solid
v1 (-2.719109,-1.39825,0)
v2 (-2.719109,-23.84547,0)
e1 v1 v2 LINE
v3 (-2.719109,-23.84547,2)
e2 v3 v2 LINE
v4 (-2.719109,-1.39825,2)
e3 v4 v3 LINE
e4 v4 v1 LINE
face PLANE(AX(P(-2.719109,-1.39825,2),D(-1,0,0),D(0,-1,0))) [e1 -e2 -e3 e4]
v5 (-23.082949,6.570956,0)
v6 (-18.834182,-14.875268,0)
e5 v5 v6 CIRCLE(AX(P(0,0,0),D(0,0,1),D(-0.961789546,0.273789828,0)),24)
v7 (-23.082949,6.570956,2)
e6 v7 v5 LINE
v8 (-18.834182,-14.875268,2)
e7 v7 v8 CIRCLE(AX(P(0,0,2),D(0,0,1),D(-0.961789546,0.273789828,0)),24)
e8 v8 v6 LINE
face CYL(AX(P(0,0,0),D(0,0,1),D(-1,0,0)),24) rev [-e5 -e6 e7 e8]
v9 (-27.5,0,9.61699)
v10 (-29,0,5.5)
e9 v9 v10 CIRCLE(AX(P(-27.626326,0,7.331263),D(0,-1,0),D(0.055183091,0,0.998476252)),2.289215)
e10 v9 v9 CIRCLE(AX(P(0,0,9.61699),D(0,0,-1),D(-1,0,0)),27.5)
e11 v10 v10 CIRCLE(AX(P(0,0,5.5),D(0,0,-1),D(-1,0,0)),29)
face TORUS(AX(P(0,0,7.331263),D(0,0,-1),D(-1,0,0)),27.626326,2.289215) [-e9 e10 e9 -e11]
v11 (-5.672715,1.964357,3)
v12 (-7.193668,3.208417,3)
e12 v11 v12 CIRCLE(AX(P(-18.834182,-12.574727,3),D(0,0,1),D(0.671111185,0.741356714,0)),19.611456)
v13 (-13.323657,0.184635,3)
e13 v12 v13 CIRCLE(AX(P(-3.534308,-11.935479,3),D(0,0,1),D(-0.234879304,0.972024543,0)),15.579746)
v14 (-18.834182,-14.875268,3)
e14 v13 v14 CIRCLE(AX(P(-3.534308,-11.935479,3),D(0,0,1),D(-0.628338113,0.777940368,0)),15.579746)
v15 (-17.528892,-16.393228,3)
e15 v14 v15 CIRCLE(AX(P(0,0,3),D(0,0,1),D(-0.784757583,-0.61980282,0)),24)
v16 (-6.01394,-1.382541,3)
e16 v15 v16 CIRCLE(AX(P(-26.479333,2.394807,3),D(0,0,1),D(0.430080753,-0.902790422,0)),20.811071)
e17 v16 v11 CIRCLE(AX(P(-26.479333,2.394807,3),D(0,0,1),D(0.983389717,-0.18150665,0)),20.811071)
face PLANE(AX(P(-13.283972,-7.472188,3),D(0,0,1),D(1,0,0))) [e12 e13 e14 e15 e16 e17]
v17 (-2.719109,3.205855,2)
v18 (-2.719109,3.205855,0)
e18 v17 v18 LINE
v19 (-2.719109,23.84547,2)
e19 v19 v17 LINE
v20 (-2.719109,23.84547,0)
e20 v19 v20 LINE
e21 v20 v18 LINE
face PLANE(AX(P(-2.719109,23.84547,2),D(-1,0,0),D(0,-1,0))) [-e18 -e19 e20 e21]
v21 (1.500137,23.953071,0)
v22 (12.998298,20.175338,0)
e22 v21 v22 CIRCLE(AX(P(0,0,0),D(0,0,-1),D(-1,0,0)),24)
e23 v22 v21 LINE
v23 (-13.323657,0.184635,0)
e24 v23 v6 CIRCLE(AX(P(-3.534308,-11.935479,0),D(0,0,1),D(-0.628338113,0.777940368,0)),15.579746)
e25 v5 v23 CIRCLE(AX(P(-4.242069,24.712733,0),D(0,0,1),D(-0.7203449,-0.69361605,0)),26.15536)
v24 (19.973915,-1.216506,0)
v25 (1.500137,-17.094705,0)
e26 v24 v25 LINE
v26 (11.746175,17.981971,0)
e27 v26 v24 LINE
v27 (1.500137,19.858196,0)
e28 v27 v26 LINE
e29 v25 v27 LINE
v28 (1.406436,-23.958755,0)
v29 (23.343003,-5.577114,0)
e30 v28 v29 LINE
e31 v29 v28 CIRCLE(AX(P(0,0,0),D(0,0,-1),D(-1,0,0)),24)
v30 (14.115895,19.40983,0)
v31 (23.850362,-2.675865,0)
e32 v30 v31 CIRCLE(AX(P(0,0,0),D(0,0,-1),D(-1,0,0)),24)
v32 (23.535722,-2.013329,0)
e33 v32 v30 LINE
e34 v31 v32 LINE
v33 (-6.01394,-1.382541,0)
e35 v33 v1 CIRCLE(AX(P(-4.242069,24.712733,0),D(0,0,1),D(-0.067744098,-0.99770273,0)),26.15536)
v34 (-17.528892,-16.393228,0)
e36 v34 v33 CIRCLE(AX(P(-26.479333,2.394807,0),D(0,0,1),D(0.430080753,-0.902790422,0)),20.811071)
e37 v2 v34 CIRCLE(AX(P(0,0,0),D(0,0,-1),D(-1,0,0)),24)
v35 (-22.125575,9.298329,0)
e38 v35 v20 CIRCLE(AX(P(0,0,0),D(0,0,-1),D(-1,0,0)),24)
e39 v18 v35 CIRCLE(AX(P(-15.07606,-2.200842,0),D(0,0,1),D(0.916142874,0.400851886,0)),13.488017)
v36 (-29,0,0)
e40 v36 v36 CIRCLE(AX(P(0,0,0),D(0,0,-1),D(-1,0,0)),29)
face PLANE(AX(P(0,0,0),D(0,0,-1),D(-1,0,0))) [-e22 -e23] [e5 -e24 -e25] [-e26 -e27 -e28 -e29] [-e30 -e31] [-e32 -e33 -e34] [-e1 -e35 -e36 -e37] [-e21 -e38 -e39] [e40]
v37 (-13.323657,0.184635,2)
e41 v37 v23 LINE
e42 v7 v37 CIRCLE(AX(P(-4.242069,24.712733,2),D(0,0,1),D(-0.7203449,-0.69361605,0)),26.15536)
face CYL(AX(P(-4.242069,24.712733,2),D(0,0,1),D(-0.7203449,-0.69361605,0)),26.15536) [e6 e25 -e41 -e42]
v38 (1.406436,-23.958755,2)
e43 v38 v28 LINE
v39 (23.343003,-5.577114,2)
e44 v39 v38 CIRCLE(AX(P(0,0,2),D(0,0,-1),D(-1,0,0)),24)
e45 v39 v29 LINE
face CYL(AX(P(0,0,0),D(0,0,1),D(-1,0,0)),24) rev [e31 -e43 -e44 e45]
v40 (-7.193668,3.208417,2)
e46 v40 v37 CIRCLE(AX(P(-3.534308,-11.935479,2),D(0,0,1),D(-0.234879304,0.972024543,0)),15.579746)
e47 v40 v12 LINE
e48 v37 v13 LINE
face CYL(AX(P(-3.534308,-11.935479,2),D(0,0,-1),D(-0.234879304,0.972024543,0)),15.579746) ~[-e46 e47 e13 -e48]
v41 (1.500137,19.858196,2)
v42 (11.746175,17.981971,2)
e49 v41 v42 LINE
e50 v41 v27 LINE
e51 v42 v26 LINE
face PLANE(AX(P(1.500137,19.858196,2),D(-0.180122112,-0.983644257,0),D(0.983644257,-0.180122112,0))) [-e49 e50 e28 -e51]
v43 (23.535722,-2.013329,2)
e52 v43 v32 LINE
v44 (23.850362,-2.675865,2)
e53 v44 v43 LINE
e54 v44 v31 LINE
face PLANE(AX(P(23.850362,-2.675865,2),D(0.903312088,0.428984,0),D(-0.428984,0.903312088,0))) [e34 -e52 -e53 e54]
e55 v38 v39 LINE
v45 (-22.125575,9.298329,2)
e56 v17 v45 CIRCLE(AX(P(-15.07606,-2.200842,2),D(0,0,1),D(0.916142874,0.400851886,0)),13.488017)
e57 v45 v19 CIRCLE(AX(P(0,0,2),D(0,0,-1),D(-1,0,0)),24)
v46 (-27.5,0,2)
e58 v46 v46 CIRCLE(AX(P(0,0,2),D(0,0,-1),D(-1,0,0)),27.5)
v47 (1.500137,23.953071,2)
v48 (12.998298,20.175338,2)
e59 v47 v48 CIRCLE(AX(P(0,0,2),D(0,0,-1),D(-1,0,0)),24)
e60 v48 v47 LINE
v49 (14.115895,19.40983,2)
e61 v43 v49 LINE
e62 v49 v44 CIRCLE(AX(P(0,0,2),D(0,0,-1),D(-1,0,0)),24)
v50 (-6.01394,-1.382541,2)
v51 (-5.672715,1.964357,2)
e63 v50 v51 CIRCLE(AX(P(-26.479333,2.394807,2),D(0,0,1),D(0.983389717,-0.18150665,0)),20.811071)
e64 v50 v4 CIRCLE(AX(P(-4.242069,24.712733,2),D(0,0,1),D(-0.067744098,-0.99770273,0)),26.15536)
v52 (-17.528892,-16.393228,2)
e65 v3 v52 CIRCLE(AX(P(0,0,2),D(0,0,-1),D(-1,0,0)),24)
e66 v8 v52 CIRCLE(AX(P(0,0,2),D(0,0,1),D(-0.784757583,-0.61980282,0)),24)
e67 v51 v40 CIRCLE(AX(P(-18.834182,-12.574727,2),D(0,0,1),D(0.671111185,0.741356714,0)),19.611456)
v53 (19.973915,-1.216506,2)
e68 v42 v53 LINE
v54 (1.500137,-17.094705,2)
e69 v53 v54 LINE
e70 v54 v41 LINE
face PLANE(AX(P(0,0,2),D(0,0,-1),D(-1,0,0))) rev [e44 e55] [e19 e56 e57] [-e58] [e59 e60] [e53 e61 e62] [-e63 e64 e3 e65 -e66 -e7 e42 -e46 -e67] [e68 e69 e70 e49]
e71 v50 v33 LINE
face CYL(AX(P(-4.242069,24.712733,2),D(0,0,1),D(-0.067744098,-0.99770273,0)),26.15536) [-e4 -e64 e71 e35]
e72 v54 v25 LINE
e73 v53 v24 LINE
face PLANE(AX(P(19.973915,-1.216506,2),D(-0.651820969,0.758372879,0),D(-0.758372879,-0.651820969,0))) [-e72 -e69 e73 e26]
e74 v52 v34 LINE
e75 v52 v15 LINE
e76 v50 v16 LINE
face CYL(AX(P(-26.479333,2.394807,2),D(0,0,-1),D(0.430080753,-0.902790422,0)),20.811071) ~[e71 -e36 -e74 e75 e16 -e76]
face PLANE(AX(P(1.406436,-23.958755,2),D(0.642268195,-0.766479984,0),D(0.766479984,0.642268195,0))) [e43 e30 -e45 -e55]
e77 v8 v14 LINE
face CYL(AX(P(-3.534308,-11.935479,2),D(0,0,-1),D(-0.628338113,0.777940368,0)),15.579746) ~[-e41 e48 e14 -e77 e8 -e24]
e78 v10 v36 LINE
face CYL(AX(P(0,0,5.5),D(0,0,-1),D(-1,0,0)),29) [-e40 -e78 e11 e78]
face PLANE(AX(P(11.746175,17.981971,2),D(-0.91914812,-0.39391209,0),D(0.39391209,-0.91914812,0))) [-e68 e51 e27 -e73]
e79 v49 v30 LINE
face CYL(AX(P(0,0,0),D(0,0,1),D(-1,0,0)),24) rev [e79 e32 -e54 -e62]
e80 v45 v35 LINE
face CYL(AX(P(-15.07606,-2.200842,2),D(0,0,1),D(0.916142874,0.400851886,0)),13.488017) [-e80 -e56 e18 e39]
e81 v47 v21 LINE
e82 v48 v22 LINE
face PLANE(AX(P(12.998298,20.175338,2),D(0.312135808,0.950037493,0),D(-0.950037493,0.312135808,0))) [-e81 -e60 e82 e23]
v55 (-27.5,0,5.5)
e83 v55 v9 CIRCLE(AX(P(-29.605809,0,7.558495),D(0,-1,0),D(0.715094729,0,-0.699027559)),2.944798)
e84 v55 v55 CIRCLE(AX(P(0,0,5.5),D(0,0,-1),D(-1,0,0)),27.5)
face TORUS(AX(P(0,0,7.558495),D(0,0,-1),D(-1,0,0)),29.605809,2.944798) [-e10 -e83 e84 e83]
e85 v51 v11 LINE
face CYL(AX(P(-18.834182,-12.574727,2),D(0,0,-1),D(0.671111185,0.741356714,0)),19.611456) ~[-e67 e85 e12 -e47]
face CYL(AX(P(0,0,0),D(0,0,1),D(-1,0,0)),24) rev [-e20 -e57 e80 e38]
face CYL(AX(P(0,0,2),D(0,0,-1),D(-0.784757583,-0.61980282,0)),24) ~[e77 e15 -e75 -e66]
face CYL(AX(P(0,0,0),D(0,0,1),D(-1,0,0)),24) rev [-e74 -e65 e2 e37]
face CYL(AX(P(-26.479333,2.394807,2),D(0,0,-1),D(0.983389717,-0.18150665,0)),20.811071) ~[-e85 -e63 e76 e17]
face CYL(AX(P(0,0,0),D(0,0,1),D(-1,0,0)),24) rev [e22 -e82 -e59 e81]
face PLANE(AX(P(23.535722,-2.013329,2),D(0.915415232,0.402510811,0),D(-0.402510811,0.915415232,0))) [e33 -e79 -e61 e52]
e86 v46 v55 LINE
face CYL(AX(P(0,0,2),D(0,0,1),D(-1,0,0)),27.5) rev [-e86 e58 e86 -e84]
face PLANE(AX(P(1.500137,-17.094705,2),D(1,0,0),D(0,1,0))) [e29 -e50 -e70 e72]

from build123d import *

# Parameters (mm, degrees)
F3_DEPTH = 2
F4_DEPTH = 1


# Not quite as in the source:
# - a feature names something its author has since deleted; it is built from what else it names


with BuildPart() as f1:
    # F0 (on Front) → F1 (revolve)
    with BuildSketch(Plane.XZ):
        Polygon((-29, 0), (-24, 0), (-24, 2), (-27.5, 2), (-27.5, 5.5), (-29, 5.5), align=None)
        with BuildLine():
            ThreePointArc((-27.5, 9.6169896424), (-29.7772258205, 8.1149302096), (-29, 5.5))
            Line((-29, 5.5), (-27.5, 5.5))
            ThreePointArc((-27.5, 5.5), (-26.6610115833, 7.5584948212), (-27.5, 9.6169896424))
        make_face()
    revolve(axis=Axis((0, 0, 2.7132770047), (0, 0, -1)))

    # F2 (on face) → F3 (join)
    with BuildSketch(Plane.XY.offset(2)):
        with BuildLine():
            Line((23.5357220544, -2.0133285341), (14.1158952872, 19.40982999))
            ThreePointArc((14.1158952872, 19.40982999), (13.5624984717, 19.8004705804), (12.9982976167, 20.1753378923))
            Line((12.9982976167, 20.1753378923), (1.5001369464, 23.9530705577))
            ThreePointArc((1.5001369464, 23.9530705577), (-0.61185618, 23.9921993993), (-2.7191094967, 23.8454700844))
            Line((-2.7191094967, 23.8454700844), (-2.7191094967, 3.205855377))
            Line((-2.7191094967, 3.205855377), (-2.7191094967, -1.398249995))
            Line((-2.7191094967, -1.398249995), (-2.7191094967, -23.8454700844))
            ThreePointArc((-2.7191094967, -23.8454700844), (-0.6587764532, -23.9909569127), (1.406435812, -23.9587549407))
            Line((1.406435812, -23.9587549407), (23.3430031088, -5.5771144744))
            ThreePointArc((23.3430031088, -5.5771144744), (23.6412294167, -4.1342800662), (23.8503615327, -2.6758652355))
            Line((23.8503615327, -2.6758652355), (23.5357220544, -2.0133285341))
        make_face()
        Polygon((1.5001369464, -17.0947052702), (1.5001369464, 19.8581963794), (11.7461745714, 17.9819713885), (19.9739150703, -1.2165056542), align=None, mode=Mode.SUBTRACT)
        with BuildLine():
            ThreePointArc((-2.7191094967, 3.205855377), (-11.036038033, 10.667911986), (-22.125575094, 9.2983292455))
            ThreePointArc((-22.125575094, 9.2983292455), (-22.6453594845, 7.9490687392), (-23.0829490937, 6.5709558771))
            ThreePointArc((-23.0829490937, 6.5709558771), (-14.7738683342, 6.6118059769), (-7.1936681304, 3.2084169794))
            ThreePointArc((-7.1936681304, 3.2084169794), (-6.4176007096, 2.6054477842), (-5.6727145132, 1.9643572708))
            ThreePointArc((-5.6727145132, 1.9643572708), (-4.0996738523, 0.3675861057), (-2.7191094967, -1.398249995))
            Line((-2.7191094967, -1.398249995), (-2.7191094967, 3.205855377))
        make_face()
        with BuildLine():
            ThreePointArc((-7.1936681304, 3.2084169794), (-14.7738683342, 6.6118059769), (-23.0829490937, 6.5709558771))
            ThreePointArc((-23.0829490937, 6.5709558771), (-18.5638120771, 2.8268811021), (-13.3236565945, 0.1846347444))
            ThreePointArc((-13.3236565945, 0.1846347444), (-10.4265323426, 2.0368417185), (-7.1936681304, 3.2084169794))
        make_face()
        with BuildLine():
            ThreePointArc((-13.3236565945, 0.1846347444), (-9.7250792571, -0.8614617254), (-6.0139401649, -1.3825407177))
            ThreePointArc((-6.0139401649, -1.3825407177), (-5.7755854856, 0.2840018043), (-5.6727145132, 1.9643572708))
            ThreePointArc((-5.6727145132, 1.9643572708), (-6.4176007096, 2.6054477842), (-7.1936681304, 3.2084169794))
            ThreePointArc((-7.1936681304, 3.2084169794), (-10.4265323426, 2.0368417185), (-13.3236565945, 0.1846347444))
        make_face()
        with BuildLine():
            ThreePointArc((-18.8341819929, -14.8752676836), (-18.1973718669, -15.6478642996), (-17.528892227, -16.3932283976))
            ThreePointArc((-17.528892227, -16.3932283976), (-9.9671253359, -10.2719865524), (-6.0139401649, -1.3825407177))
            ThreePointArc((-6.0139401649, -1.3825407177), (-9.7250792571, -0.8614617254), (-13.3236565945, 0.1846347444))
            ThreePointArc((-13.3236565945, 0.1846347444), (-18.1653516525, -6.5818760317), (-18.8341819929, -14.8752676836))
        make_face()
        with BuildLine():
            ThreePointArc((-6.0139401649, -1.3825407177), (-4.3667724447, -1.4423293633), (-2.7191094967, -1.398249995))
            ThreePointArc((-2.7191094967, -1.398249995), (-4.0996738523, 0.3675861057), (-5.6727145132, 1.9643572708))
            ThreePointArc((-5.6727145132, 1.9643572708), (-5.7755854856, 0.2840018043), (-6.0139401649, -1.3825407177))
        make_face()
    extrude(amount=-F3_DEPTH)

    # F2 (on face) → F4 (join)
    with BuildSketch(Plane.XY.offset(2)):
        with BuildLine():
            ThreePointArc((-18.8341819929, -14.8752676836), (-18.1973718669, -15.6478642996), (-17.528892227, -16.3932283976))
            ThreePointArc((-17.528892227, -16.3932283976), (-9.9671253359, -10.2719865524), (-6.0139401649, -1.3825407177))
            ThreePointArc((-6.0139401649, -1.3825407177), (-9.7250792571, -0.8614617254), (-13.3236565945, 0.1846347444))
            ThreePointArc((-13.3236565945, 0.1846347444), (-18.1653516525, -6.5818760317), (-18.8341819929, -14.8752676836))
        make_face()
        with BuildLine():
            ThreePointArc((-13.3236565945, 0.1846347444), (-9.7250792571, -0.8614617254), (-6.0139401649, -1.3825407177))
            ThreePointArc((-6.0139401649, -1.3825407177), (-5.7755854856, 0.2840018043), (-5.6727145132, 1.9643572708))
            ThreePointArc((-5.6727145132, 1.9643572708), (-6.4176007096, 2.6054477842), (-7.1936681304, 3.2084169794))
            ThreePointArc((-7.1936681304, 3.2084169794), (-10.4265323426, 2.0368417185), (-13.3236565945, 0.1846347444))
        make_face()
    extrude(amount=F4_DEPTH)


solid = f1.part
